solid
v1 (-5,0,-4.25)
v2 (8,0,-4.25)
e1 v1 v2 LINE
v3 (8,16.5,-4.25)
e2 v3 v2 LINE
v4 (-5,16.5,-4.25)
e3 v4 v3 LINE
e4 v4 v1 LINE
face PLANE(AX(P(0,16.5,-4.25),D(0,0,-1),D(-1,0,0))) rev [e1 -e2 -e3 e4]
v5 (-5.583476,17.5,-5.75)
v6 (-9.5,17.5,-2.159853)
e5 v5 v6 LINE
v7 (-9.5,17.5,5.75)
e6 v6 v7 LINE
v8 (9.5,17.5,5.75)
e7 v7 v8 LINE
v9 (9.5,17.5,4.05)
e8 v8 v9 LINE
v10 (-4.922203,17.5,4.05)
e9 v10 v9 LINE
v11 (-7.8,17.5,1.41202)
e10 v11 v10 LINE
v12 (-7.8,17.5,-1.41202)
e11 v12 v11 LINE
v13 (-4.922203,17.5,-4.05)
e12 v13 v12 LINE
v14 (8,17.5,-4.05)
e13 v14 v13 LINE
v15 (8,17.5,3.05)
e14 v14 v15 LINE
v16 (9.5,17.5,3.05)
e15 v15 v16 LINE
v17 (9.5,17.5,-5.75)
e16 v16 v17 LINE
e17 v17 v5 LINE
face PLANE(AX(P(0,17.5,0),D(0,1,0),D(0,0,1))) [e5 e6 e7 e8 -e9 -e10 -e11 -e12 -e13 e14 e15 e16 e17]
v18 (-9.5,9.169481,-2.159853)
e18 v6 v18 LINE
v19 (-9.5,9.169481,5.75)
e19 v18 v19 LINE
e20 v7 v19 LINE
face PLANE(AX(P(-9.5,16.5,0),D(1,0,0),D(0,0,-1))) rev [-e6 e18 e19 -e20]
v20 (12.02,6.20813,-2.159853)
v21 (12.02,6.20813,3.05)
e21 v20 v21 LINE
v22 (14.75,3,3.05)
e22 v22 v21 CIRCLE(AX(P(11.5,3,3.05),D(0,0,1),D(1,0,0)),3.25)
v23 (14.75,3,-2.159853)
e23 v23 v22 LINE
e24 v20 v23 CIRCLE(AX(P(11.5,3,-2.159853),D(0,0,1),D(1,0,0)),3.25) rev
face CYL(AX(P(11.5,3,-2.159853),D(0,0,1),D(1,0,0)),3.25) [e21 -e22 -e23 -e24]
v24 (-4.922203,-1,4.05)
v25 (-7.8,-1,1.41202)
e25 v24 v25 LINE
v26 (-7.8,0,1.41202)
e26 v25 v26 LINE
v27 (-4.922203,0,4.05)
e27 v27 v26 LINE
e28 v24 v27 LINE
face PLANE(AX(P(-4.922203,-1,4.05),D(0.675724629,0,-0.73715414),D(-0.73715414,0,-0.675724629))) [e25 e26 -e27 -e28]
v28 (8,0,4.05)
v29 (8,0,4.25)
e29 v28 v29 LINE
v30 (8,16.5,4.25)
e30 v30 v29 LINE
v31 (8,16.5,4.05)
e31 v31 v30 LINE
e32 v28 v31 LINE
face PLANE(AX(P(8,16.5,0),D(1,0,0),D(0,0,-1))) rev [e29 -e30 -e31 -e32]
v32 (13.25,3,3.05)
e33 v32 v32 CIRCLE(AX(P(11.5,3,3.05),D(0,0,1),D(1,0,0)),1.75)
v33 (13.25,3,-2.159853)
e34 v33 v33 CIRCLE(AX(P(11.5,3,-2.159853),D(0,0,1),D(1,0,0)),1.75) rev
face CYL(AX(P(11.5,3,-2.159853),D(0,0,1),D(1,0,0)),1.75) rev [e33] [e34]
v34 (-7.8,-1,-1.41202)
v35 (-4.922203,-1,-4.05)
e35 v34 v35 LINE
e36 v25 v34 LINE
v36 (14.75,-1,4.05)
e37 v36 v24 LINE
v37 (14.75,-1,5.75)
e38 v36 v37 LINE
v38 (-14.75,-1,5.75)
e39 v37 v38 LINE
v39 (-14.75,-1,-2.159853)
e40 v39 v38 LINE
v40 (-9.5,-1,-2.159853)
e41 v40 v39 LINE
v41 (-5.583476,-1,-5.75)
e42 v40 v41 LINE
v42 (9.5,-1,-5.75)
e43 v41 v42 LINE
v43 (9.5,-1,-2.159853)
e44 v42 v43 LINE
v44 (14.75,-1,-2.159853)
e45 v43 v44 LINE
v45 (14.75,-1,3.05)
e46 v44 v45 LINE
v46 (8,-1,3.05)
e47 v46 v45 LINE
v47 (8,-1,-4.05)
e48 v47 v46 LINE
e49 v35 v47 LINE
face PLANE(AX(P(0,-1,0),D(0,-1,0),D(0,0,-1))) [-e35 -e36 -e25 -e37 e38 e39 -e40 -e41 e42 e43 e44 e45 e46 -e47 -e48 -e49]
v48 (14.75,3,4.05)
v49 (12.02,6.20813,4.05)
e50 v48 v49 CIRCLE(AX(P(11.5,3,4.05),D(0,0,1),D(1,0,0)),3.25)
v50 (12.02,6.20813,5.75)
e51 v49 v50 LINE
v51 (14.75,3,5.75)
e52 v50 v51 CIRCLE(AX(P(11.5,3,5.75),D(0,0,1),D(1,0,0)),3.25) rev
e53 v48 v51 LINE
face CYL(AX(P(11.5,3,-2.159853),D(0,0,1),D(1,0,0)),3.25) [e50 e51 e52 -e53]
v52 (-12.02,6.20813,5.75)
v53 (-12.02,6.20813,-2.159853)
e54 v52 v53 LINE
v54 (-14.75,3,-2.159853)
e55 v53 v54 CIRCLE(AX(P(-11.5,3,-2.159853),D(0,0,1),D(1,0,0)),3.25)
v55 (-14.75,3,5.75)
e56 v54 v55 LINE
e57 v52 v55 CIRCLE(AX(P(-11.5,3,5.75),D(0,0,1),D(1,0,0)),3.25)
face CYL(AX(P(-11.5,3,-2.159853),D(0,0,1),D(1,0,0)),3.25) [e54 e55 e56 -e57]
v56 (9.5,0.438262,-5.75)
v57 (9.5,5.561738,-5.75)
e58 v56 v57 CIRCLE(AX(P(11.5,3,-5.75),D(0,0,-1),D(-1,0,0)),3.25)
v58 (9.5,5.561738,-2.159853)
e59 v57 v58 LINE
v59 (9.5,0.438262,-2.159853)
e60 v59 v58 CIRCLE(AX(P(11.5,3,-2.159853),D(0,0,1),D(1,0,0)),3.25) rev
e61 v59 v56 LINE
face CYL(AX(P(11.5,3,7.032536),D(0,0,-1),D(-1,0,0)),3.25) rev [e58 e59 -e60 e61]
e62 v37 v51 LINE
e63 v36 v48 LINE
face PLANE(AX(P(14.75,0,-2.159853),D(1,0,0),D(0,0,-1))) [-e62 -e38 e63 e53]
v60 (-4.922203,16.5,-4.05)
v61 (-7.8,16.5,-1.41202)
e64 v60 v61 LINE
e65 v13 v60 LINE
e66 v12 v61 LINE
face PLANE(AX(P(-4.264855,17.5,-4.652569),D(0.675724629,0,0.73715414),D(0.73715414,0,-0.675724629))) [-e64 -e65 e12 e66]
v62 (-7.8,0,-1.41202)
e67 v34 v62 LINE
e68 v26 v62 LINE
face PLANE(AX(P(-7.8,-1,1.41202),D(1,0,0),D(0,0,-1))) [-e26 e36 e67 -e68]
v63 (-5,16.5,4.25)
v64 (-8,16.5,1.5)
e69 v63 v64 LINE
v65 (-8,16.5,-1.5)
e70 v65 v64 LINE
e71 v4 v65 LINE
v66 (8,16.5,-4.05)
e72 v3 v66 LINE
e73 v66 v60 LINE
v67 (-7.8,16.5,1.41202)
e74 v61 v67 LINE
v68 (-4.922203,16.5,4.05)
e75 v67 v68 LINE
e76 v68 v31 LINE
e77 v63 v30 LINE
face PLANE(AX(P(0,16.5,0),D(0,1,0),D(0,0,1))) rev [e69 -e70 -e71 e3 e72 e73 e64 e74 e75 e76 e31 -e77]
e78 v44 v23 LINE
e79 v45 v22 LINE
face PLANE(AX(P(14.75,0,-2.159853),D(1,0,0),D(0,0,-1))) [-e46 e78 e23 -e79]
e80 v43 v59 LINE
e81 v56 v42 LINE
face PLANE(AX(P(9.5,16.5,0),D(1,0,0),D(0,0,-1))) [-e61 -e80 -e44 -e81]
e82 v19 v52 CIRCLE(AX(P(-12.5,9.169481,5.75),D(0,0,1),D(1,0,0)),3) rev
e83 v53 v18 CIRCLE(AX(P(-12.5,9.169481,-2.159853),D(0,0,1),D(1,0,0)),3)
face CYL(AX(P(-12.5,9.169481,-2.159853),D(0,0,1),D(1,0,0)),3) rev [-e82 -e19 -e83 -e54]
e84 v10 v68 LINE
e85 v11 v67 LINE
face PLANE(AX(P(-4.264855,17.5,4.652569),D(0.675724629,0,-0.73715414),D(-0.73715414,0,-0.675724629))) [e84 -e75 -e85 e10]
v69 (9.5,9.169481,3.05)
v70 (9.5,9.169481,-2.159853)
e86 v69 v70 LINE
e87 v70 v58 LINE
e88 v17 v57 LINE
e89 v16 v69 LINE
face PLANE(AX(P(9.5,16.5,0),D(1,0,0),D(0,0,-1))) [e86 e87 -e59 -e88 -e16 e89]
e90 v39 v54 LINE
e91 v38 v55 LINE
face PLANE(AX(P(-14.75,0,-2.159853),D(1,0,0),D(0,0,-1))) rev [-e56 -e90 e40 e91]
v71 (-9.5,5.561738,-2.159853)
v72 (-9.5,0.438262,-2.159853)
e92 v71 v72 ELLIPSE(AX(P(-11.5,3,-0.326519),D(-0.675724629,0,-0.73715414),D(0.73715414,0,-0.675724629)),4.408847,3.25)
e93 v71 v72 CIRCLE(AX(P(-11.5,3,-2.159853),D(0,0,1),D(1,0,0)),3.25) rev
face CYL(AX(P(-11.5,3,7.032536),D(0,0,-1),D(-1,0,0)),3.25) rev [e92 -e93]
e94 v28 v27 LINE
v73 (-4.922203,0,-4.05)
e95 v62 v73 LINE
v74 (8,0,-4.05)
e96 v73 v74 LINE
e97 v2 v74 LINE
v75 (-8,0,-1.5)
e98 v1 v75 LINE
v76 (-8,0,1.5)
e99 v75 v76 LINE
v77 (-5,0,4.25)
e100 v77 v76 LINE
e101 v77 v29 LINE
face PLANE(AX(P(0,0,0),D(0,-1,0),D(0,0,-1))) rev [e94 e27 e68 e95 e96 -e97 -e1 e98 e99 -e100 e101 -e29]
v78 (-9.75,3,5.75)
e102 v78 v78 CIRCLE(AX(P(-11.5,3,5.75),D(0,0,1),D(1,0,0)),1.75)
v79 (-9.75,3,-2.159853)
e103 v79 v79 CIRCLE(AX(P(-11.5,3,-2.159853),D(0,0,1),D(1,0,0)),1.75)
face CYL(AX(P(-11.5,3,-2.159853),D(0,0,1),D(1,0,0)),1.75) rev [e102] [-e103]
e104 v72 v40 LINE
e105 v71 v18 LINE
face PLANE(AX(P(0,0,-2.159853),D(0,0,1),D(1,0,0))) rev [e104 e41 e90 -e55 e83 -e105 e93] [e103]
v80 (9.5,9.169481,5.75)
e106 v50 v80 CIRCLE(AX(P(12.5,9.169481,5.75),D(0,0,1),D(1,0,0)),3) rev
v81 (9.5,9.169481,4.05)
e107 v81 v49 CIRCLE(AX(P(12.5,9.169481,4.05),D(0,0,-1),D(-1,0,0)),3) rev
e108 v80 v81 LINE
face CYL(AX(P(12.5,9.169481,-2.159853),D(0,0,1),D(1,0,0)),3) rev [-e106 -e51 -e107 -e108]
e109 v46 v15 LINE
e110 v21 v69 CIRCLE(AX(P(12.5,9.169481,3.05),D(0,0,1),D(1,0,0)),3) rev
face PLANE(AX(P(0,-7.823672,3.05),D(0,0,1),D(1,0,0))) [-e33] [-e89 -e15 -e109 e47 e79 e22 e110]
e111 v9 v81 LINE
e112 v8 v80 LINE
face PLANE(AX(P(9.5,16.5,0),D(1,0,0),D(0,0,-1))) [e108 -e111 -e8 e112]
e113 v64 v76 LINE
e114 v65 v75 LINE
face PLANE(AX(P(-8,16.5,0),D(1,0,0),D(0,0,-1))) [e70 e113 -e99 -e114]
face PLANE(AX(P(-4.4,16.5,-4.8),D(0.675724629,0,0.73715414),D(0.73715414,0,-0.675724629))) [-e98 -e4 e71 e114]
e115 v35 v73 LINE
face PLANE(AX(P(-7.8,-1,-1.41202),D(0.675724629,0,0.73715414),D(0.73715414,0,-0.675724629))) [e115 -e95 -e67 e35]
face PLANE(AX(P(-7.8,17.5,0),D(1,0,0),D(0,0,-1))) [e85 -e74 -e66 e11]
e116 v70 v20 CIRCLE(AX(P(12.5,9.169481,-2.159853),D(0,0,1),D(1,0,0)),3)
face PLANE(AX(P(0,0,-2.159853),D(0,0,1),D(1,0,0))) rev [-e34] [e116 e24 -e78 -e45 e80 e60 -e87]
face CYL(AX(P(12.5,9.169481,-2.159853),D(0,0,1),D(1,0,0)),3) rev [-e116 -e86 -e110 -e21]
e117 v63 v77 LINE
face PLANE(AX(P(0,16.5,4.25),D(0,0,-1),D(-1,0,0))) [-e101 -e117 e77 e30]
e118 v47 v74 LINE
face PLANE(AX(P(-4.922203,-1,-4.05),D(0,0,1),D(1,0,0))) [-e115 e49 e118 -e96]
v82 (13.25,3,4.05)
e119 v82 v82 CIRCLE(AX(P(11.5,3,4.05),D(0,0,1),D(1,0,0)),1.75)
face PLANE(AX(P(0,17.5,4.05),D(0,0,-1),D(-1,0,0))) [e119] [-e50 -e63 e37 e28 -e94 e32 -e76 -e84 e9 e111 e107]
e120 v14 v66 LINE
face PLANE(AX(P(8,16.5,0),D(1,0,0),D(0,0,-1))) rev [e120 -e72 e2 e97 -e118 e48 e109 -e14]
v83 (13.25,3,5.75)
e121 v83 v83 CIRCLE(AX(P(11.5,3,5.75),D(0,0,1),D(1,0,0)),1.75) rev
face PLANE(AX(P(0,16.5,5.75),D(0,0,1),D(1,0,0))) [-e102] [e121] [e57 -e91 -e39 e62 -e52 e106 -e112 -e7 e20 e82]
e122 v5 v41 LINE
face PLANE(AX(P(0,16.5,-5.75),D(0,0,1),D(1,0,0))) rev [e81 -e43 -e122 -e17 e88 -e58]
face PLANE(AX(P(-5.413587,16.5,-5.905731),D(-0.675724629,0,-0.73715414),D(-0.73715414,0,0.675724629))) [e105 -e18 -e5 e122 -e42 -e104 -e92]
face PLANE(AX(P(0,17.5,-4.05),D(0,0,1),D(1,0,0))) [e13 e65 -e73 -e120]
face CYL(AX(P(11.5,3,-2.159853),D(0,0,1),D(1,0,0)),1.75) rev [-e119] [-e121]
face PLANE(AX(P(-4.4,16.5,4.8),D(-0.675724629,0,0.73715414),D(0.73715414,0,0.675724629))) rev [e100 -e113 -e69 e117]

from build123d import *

# Parameters (mm, degrees)
BOSS_EXTRUDE1_DEPTH = 16.5
BOSS_EXTRUDE7_DEPTH = 1
BOSS_EXTRUDE8_DEPTH = 1
SKETCH9_R           = 1.75
BOSS_EXTRUDE9_DEPTH = 7.909853
CUT_EXTRUDE2_START  = -3.590147425
SKETCH11_R          = 3.25
CUT_EXTRUDE2_DEPTH  = 3.590147425
CUT_EXTRUDE3_START  = -18.5
SKETCH12_W          = 5.25
SKETCH12_H          = 1
SKETCH12_W_2        = 1.5
CUT_EXTRUDE3_DEPTH  = 18.5
FILLET1_R           = 3


with BuildPart() as part:
    # Sketch1 → Boss-Extrude1 (new body)
    with BuildSketch(Plane(origin=(0, 0, 0), x_dir=(1, 0, 0), z_dir=(0, 1, 0))):
        Polygon((-7.219839172, 4.25), (-5, 4.25), (8, 4.25), (8, -4.25), (-5, -4.25), (-7.219839172, -4.25), (-5.583475536, -5.75), (9.5, -5.75), (9.5, 5.75), (-5.583475536, 5.75), align=None)
        Polygon((-8, -4.25), (-8, -3.534852575), (-9.5, -2.159852575), (-9.5, -5.75), (-5.583475536, -5.75), (-7.219839172, -4.25), align=None)
        Polygon((-8, -1.5), (-8, 1.5), (-8, 3.534852575), (-9.5, 2.159852575), (-9.5, -2.159852575), (-8, -3.534852575), align=None)
        Polygon((-8, 1.5), (-5, 4.25), (-7.219839172, 4.25), (-8, 3.534852575), align=None)
        Polygon((-5, -4.25), (-8, -1.5), (-8, -3.534852575), (-7.219839172, -4.25), align=None)
        Polygon((-7.219839172, -4.25), (-8, -3.534852575), (-8, -4.25), align=None)
    extrude(amount=BOSS_EXTRUDE1_DEPTH)

    # Sketch7 → Boss-Extrude7 (add)
    # profile 1 of 2: a face of its own
    with BuildSketch(Plane(origin=(0, 16.5, 0), x_dir=(1, 0, 0), z_dir=(0, 1, 0))):
        Polygon((9.5, 5.75), (-5.583475536, 5.75), (-9.5, 2.159852575), (-9.5, -5.75), (9.5, -5.75), align=None)
        Polygon((8, -4.25), (-5, -4.25), (-8, -1.5), (-8, 1.5), (-5, 4.25), (8, 4.25), align=None, mode=Mode.SUBTRACT)
    # profile 2 of 2: a face of its own
    with BuildSketch(Plane(origin=(0, 16.5, 0), x_dir=(1, 0, 0), z_dir=(0, 1, 0))):
        Polygon((-4.922203262, 4.05), (7.8, 4.05), (8, 4.05), (8, 4.25), (-5, 4.25), (-8, 1.5), (-8, -1.5), (-5, -4.25), (8, -4.25), (8, -4.05), (7.8, -4.05), (-4.922203262, -4.05), (-7.8, -1.412019657), (-7.8, 1.412019657), align=None)
    extrude(amount=BOSS_EXTRUDE7_DEPTH)

    # Sketch8 → Boss-Extrude8 (add)
    with BuildSketch(Plane.XZ):
        Polygon((-9.5, -2.159852575), (-5.583475536, -5.75), (9.5, -5.75), (9.5, 5.75), (-9.5, 5.75), align=None)
        Polygon((8, 4.05), (-4.922203262, 4.05), (-7.8, 1.412019657), (-7.8, -1.412019657), (-4.922203262, -4.05), (8, -4.05), align=None, mode=Mode.SUBTRACT)
    extrude(amount=BOSS_EXTRUDE8_DEPTH)

    # Sketch9 → Boss-Extrude9 (add)
    # profile 1 of 4: a face of its own
    with BuildSketch(Plane.XY.offset(5.75)):
        with BuildLine():
            Line((-9.5, 0.438262309), (-9.5, 5.561737691))
            ThreePointArc((-9.5, 5.561737691), (-12.925219281, 5.920830361), (-14.75, 3))
            ThreePointArc((-14.75, 3), (-12.925219281, 0.079169639), (-9.5, 0.438262309))
        make_face()
        with Locations((-11.5, 3)):
            Circle(SKETCH9_R, mode=Mode.SUBTRACT)
    # profile 2 of 4: a face of its own
    with BuildSketch(Plane.XY.offset(5.75)):
        with BuildLine():
            ThreePointArc((14.75, 3), (12.925219281, 5.920830361), (9.5, 5.561737691))
            Line((9.5, 5.561737691), (9.5, 0.438262309))
            ThreePointArc((9.5, 0.438262309), (12.925219281, 0.079169639), (14.75, 3))
        make_face()
        with Locations((11.5, 3)):
            Circle(SKETCH9_R, mode=Mode.SUBTRACT)
    # profile 3 of 4: a face of its own
    with BuildSketch(Plane.XY.offset(5.75)):
        with BuildLine():
            Line((-9.5, -1), (-9.5, 0.438262309))
            ThreePointArc((-9.5, 0.438262309), (-12.925219281, 0.079169639), (-14.75, 3))
            Line((-14.75, 3), (-14.75, -1))
            Line((-14.75, -1), (-9.5, -1))
        make_face()
    # profile 4 of 4: a face of its own
    with BuildSketch(Plane.XY.offset(5.75)):
        with BuildLine():
            ThreePointArc((14.75, 3), (12.925219281, 0.079169639), (9.5, 0.438262309))
            Line((9.5, 0.438262309), (9.5, -1))
            Line((9.5, -1), (14.75, -1))
            Line((14.75, -1), (14.75, 3))
        make_face()
    extrude(amount=-BOSS_EXTRUDE9_DEPTH)

    # Sketch11 → Cut-Extrude2 (cut)
    with BuildSketch(Plane(origin=(0, 0, -5.75), x_dir=(-1, 0, 0), z_dir=(0, 0, -1)).offset(CUT_EXTRUDE2_START)):
        with Locations((-11.5, 3)):
            Circle(SKETCH11_R)
        with Locations((11.5, 3)):
            Circle(SKETCH11_R)
    extrude(amount=CUT_EXTRUDE2_DEPTH, mode=Mode.SUBTRACT)

    # Sketch12 → Cut-Extrude3 (cut)
    with BuildSketch(Plane(origin=(0, 17.5, 0), x_dir=(1, 0, 0), z_dir=(0, 1, 0)).offset(CUT_EXTRUDE3_START)):
        with Locations((12.125, -3.55)):
            Rectangle(SKETCH12_W, SKETCH12_H)
        with Locations((8.75, -3.55)):
            Rectangle(SKETCH12_W_2, SKETCH12_H)
    extrude(amount=CUT_EXTRUDE3_DEPTH, mode=Mode.SUBTRACT)

    # Fillet1
    # the kernel refuses this fillet: 3 mm, written as the material it adds along each edge
    with BuildSketch(Plane(origin=(-9.5, 5.561737691, 5.75), x_dir=(0, 1, 0), z_dir=(0, 0, -1))) as fillet1_piece_1_section:
        with BuildLine():
            CenterArc((3.607743648, -3), FILLET1_R, 90, 80.793103779)
            ThreePointArc((0.646392605, -2.52), (0.5863481, -1.192500248), (0, 0))
            Line((0, 0), (3.607743648, 0))
        make_face()
    fillet1_piece_1 = extrude(amount=16.929211695, mode=Mode.PRIVATE)
    fillet1_piece_1 = split(fillet1_piece_1, bisect_by=Plane(origin=(-10.050248637, 6.751557593, -2.159853), z_dir=(0, 0, 1)), keep=Keep.TOP, mode=Mode.PRIVATE)
    add(fillet1_piece_1)
    with BuildSketch(Plane(origin=(9.5, 5.561737691, 12.06935912), x_dir=(0.968641781969148, 0.24846146225045335, 0), z_dir=(0, 0, -1))) as fillet1_piece_2_section:
        with BuildLine():
            CenterArc((3.802310608, -2.749226849), FILLET1_R, 113.593384333, 80.793103779)
            Line((0.896385262, -3.494611236), (0, 0))
            ThreePointArc((0, 0), (1.300790471, -0.271670913), (2.601580942, 0))
        make_face()
    fillet1_piece_2 = extrude(amount=23.248570816, mode=Mode.PRIVATE)
    fillet1_piece_2 = split(fillet1_piece_2, bisect_by=Plane(origin=(10.078407886, 6.738604844, 5.75), z_dir=(0, 0, -1)), keep=Keep.TOP, mode=Mode.PRIVATE)
    fillet1_piece_2 = split(fillet1_piece_2, bisect_by=Plane(origin=(10.078407886, 6.738604844, 4.05), z_dir=(0, 0, 1)), keep=Keep.TOP, mode=Mode.PRIVATE)
    add(fillet1_piece_2)
    with BuildSketch(Plane(origin=(9.5, 5.561737691, 3.05), x_dir=(0.9686417819691505, 0.24846146225044377, 0), z_dir=(0, 0, -1))) as fillet1_piece_3:
        with BuildLine():
            CenterArc((3.802310608, -2.749226849), FILLET1_R, 113.593384333, 80.793103779)
            Line((0.896385262, -3.494611236), (0, 0))
            ThreePointArc((0, 0), (1.300790471, -0.271670913), (2.601580942, 0))
        make_face()
    extrude(amount=5.209852575)
    with BuildSketch(Plane(origin=(9.5, 5.561737691, 5.75), x_dir=(0.9686417819691505, 0.24846146225044377, 0), z_dir=(0, 0, -1))) as fillet1_piece_4:
        with BuildLine():
            CenterArc((3.802310608, -2.749226849), FILLET1_R, 113.593384333, 80.793103779)
            Line((0.896385262, -3.494611236), (0, 0))
            ThreePointArc((0, 0), (1.300790471, -0.271670913), (2.601580942, 0))
        make_face()
    extrude(amount=1.7)
    with BuildSketch(Plane(origin=(9.5, 5.561737691, 14.76935912), x_dir=(0.968641781969148, 0.24846146225045335, 0), z_dir=(0, 0, -1))) as fillet1_piece_5_section:
        with BuildLine():
            CenterArc((3.802310608, -2.749226849), FILLET1_R, 113.593384333, 80.793103779)
            Line((0.896385262, -3.494611236), (0, 0))
            ThreePointArc((0, 0), (1.300790471, -0.271670913), (2.601580942, 0))
        make_face()
    fillet1_piece_5 = extrude(amount=19.738718241, mode=Mode.PRIVATE)
    fillet1_piece_5 = split(fillet1_piece_5, bisect_by=Plane(origin=(10.078407886, 6.738604844, 3.05), z_dir=(0, 0, -1)), keep=Keep.TOP, mode=Mode.PRIVATE)
    fillet1_piece_5 = split(fillet1_piece_5, bisect_by=Plane(origin=(10.078407886, 6.738604844, -2.159852575), z_dir=(0, 0, 1)), keep=Keep.TOP, mode=Mode.PRIVATE)
    add(fillet1_piece_5)


solid = part.part
